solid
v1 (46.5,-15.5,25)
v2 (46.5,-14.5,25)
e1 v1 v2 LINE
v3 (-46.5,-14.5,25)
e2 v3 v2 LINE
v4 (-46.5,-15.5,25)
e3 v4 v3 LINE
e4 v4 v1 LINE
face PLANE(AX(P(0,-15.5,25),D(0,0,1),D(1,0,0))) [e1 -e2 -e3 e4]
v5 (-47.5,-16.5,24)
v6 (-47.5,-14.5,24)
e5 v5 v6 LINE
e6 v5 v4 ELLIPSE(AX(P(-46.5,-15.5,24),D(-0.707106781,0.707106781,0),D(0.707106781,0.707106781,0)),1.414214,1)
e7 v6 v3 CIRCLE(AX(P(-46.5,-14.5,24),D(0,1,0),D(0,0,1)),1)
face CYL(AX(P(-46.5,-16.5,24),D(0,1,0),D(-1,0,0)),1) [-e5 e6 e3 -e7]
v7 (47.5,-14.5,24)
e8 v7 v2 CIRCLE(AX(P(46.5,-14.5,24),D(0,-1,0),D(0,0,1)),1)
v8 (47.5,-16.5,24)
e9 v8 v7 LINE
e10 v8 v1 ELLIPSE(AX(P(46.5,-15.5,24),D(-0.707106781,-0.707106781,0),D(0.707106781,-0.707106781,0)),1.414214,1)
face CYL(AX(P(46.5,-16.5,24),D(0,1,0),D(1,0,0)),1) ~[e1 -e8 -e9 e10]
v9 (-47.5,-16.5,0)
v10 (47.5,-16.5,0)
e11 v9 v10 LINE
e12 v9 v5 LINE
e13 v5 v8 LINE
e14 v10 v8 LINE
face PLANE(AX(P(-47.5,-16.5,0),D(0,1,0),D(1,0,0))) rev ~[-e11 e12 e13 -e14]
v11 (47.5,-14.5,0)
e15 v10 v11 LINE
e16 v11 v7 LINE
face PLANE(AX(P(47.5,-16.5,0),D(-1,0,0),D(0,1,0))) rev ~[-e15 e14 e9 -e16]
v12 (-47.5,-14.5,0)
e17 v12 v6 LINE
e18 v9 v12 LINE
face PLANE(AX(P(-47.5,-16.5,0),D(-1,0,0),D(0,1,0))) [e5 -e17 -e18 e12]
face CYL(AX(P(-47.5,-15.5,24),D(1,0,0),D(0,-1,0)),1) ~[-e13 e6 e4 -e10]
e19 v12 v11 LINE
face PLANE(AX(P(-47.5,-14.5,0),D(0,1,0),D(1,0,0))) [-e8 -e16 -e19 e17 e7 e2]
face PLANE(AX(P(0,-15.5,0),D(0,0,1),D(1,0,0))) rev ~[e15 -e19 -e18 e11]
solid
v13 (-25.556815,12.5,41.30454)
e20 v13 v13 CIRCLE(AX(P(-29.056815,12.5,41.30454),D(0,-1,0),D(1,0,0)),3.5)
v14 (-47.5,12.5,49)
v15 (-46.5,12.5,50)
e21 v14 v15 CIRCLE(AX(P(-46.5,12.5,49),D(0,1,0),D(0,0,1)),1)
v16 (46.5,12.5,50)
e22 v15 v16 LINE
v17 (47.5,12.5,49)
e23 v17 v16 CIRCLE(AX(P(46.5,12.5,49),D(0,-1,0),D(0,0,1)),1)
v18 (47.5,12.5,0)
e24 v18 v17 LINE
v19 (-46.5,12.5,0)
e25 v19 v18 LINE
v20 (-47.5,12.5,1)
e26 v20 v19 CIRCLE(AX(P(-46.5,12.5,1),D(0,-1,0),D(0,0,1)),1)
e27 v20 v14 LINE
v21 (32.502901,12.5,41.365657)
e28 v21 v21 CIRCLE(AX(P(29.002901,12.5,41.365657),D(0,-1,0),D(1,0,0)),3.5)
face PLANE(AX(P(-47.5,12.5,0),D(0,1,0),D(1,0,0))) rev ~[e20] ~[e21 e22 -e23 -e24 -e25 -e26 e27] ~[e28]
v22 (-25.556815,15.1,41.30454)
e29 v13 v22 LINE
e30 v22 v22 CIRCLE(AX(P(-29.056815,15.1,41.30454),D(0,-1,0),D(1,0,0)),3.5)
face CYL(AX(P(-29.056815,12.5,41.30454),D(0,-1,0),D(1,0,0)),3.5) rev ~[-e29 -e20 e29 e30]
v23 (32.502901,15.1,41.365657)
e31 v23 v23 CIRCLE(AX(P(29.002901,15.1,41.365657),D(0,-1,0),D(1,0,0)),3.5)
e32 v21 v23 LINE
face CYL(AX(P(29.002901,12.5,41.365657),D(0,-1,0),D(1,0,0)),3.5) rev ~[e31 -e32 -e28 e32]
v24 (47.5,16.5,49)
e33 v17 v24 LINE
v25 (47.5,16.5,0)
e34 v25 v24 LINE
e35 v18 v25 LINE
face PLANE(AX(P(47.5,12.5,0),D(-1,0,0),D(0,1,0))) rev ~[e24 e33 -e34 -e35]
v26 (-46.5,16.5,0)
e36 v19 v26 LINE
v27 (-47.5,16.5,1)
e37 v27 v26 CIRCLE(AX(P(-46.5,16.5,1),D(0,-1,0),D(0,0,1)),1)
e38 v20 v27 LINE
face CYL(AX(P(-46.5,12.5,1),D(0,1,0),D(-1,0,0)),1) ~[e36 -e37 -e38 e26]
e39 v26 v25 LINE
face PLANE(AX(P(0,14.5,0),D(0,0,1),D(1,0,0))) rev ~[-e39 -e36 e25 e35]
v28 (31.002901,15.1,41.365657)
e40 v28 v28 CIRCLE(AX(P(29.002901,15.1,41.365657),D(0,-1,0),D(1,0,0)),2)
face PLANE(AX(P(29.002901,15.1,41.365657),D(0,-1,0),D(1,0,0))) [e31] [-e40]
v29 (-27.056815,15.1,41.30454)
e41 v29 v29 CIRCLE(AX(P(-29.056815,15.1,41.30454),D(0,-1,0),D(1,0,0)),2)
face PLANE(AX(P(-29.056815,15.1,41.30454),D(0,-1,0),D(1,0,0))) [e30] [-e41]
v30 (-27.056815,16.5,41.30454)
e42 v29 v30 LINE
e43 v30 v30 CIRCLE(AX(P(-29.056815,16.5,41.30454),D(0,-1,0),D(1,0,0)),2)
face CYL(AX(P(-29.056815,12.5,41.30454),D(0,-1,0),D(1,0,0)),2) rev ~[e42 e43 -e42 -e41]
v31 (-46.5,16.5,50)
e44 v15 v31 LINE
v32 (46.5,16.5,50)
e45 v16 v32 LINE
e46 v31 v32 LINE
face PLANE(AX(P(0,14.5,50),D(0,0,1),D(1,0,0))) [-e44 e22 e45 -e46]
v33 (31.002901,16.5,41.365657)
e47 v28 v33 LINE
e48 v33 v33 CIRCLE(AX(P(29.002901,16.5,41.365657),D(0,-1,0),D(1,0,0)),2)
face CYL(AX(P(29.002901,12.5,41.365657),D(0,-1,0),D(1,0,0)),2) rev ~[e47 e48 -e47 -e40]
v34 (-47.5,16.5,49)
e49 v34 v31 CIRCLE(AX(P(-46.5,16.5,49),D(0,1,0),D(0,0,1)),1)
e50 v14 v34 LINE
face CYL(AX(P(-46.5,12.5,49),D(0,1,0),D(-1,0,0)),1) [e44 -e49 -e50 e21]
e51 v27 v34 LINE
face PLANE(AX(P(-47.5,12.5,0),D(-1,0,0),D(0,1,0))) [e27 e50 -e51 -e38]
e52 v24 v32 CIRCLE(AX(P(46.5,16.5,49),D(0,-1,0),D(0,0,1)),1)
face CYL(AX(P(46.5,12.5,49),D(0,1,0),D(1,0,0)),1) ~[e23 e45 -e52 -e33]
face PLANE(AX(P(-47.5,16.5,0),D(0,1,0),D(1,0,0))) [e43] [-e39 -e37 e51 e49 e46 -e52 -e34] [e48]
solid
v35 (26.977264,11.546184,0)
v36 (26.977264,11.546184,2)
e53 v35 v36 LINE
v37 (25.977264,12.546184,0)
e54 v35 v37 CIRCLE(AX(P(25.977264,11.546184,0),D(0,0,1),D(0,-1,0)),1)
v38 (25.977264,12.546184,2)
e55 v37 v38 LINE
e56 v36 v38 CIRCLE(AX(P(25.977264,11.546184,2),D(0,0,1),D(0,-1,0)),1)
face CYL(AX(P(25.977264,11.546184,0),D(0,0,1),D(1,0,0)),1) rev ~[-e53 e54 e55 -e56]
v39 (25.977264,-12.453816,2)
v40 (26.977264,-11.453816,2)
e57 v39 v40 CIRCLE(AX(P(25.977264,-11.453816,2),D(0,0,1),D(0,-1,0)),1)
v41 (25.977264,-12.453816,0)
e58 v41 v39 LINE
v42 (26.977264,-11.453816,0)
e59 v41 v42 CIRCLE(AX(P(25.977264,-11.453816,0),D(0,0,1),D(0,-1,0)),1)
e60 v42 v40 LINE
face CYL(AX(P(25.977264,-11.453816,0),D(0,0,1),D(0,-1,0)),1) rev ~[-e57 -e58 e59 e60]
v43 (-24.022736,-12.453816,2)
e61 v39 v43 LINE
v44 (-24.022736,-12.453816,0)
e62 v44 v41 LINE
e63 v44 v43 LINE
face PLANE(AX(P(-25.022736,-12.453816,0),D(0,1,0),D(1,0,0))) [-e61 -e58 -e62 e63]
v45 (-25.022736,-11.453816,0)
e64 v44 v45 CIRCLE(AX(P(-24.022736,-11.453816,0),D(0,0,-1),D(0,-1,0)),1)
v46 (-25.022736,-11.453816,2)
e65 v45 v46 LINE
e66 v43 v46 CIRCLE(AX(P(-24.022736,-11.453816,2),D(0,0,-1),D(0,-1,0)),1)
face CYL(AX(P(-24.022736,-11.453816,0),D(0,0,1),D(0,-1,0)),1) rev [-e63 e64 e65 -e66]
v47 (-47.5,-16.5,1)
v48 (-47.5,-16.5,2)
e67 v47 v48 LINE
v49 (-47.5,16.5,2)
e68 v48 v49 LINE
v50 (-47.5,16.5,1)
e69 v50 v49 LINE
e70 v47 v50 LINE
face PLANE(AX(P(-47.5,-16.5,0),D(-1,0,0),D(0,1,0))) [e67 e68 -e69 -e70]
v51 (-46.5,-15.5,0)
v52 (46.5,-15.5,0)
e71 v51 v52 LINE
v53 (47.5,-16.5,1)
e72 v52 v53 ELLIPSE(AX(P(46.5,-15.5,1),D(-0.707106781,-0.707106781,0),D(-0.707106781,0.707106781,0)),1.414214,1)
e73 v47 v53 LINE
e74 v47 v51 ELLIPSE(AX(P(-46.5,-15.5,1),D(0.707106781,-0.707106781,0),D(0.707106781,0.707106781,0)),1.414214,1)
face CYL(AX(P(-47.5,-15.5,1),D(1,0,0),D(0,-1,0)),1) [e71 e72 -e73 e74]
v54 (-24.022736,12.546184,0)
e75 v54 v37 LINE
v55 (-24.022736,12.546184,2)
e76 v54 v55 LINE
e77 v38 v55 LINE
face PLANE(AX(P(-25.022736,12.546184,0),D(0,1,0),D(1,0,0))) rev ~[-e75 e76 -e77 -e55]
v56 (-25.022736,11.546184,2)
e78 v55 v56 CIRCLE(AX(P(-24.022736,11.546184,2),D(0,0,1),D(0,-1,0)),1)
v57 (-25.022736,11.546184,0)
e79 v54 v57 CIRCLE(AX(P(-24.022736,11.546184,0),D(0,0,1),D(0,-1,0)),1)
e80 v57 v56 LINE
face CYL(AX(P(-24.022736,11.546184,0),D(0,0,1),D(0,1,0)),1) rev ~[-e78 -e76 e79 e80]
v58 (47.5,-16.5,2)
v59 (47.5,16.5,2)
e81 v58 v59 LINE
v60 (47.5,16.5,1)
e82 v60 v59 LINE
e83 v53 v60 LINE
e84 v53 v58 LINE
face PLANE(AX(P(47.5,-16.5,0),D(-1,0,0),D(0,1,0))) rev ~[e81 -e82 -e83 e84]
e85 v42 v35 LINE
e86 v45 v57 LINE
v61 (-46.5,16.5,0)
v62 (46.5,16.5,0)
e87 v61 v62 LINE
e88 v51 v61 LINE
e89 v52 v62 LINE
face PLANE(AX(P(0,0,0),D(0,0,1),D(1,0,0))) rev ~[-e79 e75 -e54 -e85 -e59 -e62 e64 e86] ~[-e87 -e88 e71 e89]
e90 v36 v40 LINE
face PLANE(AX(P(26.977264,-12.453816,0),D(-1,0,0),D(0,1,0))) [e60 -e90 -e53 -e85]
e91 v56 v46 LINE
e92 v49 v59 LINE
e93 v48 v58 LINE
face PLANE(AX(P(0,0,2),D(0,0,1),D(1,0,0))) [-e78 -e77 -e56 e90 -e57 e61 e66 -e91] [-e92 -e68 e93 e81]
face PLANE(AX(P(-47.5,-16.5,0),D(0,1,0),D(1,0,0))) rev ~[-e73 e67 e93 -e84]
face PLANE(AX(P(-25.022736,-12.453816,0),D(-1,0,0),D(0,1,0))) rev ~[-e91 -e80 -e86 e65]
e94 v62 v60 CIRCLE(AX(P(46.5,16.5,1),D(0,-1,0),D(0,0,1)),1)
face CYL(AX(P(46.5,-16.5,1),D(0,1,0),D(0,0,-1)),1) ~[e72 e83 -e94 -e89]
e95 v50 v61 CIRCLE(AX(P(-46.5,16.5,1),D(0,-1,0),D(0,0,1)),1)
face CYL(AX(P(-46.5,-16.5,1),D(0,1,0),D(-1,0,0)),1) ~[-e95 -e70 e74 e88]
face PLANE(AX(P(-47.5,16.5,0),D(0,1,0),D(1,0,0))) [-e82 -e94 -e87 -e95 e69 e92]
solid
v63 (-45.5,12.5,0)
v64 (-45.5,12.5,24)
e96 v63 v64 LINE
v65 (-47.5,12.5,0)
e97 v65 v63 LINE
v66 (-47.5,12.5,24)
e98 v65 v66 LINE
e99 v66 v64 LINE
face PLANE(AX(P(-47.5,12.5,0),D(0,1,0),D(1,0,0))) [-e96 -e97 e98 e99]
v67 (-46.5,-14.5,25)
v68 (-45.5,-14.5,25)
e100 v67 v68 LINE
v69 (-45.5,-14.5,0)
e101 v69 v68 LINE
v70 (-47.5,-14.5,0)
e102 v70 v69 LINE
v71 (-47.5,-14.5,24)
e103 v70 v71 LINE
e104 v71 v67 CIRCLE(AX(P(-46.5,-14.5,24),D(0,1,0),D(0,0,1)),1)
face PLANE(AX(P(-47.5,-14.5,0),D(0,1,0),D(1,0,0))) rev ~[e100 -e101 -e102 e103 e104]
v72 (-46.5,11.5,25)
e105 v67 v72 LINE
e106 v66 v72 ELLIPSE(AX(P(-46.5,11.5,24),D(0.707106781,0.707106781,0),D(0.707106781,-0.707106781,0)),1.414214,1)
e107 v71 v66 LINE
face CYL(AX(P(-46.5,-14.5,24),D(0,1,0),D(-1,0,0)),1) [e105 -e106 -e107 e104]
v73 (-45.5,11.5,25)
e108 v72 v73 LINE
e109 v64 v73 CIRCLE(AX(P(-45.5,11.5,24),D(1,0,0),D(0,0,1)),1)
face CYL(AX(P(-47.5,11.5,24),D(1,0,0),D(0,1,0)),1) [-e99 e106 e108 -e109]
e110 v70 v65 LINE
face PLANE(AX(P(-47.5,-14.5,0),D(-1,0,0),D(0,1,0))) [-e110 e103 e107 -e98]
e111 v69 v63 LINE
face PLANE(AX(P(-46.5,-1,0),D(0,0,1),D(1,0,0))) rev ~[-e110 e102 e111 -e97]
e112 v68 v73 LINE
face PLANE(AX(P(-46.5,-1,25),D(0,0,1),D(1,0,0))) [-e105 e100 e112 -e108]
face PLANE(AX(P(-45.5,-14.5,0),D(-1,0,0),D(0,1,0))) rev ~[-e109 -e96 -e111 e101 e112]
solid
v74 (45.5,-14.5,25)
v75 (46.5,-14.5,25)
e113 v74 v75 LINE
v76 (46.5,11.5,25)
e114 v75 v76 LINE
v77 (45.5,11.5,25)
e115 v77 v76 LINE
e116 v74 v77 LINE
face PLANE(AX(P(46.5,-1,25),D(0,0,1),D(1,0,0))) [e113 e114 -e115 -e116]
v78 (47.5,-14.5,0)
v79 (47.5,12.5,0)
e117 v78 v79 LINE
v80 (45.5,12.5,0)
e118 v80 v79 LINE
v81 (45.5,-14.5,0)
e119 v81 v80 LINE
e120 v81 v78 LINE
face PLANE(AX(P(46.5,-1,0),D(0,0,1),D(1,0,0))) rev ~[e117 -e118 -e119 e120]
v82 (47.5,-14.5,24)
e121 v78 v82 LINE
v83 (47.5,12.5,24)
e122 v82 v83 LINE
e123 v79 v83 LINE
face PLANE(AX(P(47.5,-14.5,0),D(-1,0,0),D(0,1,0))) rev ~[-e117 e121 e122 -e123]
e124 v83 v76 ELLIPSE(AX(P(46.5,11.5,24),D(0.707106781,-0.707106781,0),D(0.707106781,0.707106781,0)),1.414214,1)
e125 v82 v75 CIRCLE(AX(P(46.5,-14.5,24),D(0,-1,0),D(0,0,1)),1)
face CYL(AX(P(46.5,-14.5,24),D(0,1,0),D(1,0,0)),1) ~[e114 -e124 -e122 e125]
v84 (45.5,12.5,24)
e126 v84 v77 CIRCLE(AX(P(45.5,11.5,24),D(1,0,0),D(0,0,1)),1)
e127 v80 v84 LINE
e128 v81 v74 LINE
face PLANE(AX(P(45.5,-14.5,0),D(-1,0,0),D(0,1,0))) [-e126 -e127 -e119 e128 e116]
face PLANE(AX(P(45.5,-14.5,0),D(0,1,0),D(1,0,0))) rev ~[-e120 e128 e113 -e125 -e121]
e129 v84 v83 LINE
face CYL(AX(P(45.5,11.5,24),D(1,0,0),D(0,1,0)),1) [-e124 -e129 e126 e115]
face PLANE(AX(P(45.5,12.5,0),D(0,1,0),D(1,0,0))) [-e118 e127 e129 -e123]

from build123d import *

# Parameters (mm, degrees)
F0_W      = 95
F0_H      = 33
F1_DEPTH  = 2
F4_W      = 95
F4_H      = 2
F7_DEPTH  = 25
F5_W      = 2
F5_H      = 27
F6_W      = 2
F6_H      = 27
F3_W      = 95
F3_H      = 4
F8_DEPTH  = 50
F2_W      = 52
F2_H      = 25
F9_DEPTH  = 6
F10_R     = 1
F10_2_R   = 1
F10_3_R   = 1
F10_4_R   = 1
F10_5_R   = 1
F11_R     = 2
F12_DEPTH = 4
F13_R     = 3.5
F14_DEPTH = 2.6


with BuildPart() as f1:
    # F0 (on Top) → F1 (new body)
    with BuildSketch(Plane.XY):
        Rectangle(F0_W, F0_H)
    extrude(amount=F1_DEPTH)

    # F2 (on face) → F9 (cut)
    with BuildSketch(Plane.XY):
        with Locations((0.9772641808, 0.0461841002)):
            Rectangle(F2_W, F2_H)
    extrude(amount=F9_DEPTH, mode=Mode.SUBTRACT)

    # F10
    f10_edges = [f1.edges().sort_by_distance(p)[0] for p in [
        (-47.5, 0, 0),
        (47.5, 0, 0),
        (0, -16.5, 0),
        (-25.022736, -12.453816, 1),
        (26.977264, -12.453816, 1),
        (26.977264, 12.546184, 1),
        (-25.022736, 12.546184, 1),
    ]]
    fillet(f10_edges, radius=F10_R)


with BuildPart() as f7:
    # F4 (on face) → F7 (new body)
    with BuildSketch(Plane.XY):
        with Locations((0, -15.5)):
            Rectangle(F4_W, F4_H)
    extrude(amount=F7_DEPTH)

    # F10#2
    f10_2_edges = [f7.edges().sort_by_distance(p)[0] for p in [
        (0, -16.5, 25),
        (-47.5, -15.5, 25),
        (47.5, -15.5, 25),
    ]]
    fillet(f10_2_edges, radius=F10_2_R)


with BuildPart() as f7b:
    # F5 (on face) → F7, piece 2 (new body)
    with BuildSketch(Plane.XY):
        with Locations((-46.5, -1)):
            Rectangle(F5_W, F5_H)
    extrude(amount=F7_DEPTH)

    # F10#3
    f10_3_edges = [f7b.edges().sort_by_distance(p)[0] for p in [
        (-46.5, 12.5, 25),
        (-47.5, -1, 25),
    ]]
    fillet(f10_3_edges, radius=F10_3_R)


with BuildPart() as f7c:
    # F6 (on face) → F7, piece 3 (new body)
    with BuildSketch(Plane.XY):
        with Locations((46.5, -1)):
            Rectangle(F6_W, F6_H)
    extrude(amount=F7_DEPTH)

    # F10#4
    f10_4_edges = [f7c.edges().sort_by_distance(p)[0] for p in [
        (46.5, 12.5, 25),
        (47.5, -1, 25),
    ]]
    fillet(f10_4_edges, radius=F10_4_R)


with BuildPart() as f8:
    # F3 (on face) → F8 (new body)
    with BuildSketch(Plane.XY):
        with Locations((0, 14.5)):
            Rectangle(F3_W, F3_H)
    extrude(amount=F8_DEPTH)

    # F10#5
    f10_5_edges = [f8.edges().sort_by_distance(p)[0] for p in [
        (47.5, 14.5, 50),
        (-47.5, 14.5, 50),
        (-47.5, 14.5, 0),
    ]]
    fillet(f10_5_edges, radius=F10_5_R)

    # F11 (on face) → F12 (cut)
    with BuildSketch(Plane.XZ.offset(-12.5)):
        with Locations((-29.0568154305, 41.3045398891)):
            Circle(F11_R)
        with Locations((29.0029011667, 41.3656570017)):
            Circle(F11_R)
    extrude(amount=-F12_DEPTH, mode=Mode.SUBTRACT)

    # F13 (on face) → F14 (cut)
    with BuildSketch(Plane.XZ.offset(-12.5)):
        with Locations((-29.0568154305, 41.3045398891)):
            Circle(F13_R)
        with Locations((29.0029011667, 41.3656570017)):
            Circle(F13_R)
    extrude(amount=-F14_DEPTH, mode=Mode.SUBTRACT)


solid = Compound([f1.part, f7.part, f7b.part, f7c.part, f8.part])
